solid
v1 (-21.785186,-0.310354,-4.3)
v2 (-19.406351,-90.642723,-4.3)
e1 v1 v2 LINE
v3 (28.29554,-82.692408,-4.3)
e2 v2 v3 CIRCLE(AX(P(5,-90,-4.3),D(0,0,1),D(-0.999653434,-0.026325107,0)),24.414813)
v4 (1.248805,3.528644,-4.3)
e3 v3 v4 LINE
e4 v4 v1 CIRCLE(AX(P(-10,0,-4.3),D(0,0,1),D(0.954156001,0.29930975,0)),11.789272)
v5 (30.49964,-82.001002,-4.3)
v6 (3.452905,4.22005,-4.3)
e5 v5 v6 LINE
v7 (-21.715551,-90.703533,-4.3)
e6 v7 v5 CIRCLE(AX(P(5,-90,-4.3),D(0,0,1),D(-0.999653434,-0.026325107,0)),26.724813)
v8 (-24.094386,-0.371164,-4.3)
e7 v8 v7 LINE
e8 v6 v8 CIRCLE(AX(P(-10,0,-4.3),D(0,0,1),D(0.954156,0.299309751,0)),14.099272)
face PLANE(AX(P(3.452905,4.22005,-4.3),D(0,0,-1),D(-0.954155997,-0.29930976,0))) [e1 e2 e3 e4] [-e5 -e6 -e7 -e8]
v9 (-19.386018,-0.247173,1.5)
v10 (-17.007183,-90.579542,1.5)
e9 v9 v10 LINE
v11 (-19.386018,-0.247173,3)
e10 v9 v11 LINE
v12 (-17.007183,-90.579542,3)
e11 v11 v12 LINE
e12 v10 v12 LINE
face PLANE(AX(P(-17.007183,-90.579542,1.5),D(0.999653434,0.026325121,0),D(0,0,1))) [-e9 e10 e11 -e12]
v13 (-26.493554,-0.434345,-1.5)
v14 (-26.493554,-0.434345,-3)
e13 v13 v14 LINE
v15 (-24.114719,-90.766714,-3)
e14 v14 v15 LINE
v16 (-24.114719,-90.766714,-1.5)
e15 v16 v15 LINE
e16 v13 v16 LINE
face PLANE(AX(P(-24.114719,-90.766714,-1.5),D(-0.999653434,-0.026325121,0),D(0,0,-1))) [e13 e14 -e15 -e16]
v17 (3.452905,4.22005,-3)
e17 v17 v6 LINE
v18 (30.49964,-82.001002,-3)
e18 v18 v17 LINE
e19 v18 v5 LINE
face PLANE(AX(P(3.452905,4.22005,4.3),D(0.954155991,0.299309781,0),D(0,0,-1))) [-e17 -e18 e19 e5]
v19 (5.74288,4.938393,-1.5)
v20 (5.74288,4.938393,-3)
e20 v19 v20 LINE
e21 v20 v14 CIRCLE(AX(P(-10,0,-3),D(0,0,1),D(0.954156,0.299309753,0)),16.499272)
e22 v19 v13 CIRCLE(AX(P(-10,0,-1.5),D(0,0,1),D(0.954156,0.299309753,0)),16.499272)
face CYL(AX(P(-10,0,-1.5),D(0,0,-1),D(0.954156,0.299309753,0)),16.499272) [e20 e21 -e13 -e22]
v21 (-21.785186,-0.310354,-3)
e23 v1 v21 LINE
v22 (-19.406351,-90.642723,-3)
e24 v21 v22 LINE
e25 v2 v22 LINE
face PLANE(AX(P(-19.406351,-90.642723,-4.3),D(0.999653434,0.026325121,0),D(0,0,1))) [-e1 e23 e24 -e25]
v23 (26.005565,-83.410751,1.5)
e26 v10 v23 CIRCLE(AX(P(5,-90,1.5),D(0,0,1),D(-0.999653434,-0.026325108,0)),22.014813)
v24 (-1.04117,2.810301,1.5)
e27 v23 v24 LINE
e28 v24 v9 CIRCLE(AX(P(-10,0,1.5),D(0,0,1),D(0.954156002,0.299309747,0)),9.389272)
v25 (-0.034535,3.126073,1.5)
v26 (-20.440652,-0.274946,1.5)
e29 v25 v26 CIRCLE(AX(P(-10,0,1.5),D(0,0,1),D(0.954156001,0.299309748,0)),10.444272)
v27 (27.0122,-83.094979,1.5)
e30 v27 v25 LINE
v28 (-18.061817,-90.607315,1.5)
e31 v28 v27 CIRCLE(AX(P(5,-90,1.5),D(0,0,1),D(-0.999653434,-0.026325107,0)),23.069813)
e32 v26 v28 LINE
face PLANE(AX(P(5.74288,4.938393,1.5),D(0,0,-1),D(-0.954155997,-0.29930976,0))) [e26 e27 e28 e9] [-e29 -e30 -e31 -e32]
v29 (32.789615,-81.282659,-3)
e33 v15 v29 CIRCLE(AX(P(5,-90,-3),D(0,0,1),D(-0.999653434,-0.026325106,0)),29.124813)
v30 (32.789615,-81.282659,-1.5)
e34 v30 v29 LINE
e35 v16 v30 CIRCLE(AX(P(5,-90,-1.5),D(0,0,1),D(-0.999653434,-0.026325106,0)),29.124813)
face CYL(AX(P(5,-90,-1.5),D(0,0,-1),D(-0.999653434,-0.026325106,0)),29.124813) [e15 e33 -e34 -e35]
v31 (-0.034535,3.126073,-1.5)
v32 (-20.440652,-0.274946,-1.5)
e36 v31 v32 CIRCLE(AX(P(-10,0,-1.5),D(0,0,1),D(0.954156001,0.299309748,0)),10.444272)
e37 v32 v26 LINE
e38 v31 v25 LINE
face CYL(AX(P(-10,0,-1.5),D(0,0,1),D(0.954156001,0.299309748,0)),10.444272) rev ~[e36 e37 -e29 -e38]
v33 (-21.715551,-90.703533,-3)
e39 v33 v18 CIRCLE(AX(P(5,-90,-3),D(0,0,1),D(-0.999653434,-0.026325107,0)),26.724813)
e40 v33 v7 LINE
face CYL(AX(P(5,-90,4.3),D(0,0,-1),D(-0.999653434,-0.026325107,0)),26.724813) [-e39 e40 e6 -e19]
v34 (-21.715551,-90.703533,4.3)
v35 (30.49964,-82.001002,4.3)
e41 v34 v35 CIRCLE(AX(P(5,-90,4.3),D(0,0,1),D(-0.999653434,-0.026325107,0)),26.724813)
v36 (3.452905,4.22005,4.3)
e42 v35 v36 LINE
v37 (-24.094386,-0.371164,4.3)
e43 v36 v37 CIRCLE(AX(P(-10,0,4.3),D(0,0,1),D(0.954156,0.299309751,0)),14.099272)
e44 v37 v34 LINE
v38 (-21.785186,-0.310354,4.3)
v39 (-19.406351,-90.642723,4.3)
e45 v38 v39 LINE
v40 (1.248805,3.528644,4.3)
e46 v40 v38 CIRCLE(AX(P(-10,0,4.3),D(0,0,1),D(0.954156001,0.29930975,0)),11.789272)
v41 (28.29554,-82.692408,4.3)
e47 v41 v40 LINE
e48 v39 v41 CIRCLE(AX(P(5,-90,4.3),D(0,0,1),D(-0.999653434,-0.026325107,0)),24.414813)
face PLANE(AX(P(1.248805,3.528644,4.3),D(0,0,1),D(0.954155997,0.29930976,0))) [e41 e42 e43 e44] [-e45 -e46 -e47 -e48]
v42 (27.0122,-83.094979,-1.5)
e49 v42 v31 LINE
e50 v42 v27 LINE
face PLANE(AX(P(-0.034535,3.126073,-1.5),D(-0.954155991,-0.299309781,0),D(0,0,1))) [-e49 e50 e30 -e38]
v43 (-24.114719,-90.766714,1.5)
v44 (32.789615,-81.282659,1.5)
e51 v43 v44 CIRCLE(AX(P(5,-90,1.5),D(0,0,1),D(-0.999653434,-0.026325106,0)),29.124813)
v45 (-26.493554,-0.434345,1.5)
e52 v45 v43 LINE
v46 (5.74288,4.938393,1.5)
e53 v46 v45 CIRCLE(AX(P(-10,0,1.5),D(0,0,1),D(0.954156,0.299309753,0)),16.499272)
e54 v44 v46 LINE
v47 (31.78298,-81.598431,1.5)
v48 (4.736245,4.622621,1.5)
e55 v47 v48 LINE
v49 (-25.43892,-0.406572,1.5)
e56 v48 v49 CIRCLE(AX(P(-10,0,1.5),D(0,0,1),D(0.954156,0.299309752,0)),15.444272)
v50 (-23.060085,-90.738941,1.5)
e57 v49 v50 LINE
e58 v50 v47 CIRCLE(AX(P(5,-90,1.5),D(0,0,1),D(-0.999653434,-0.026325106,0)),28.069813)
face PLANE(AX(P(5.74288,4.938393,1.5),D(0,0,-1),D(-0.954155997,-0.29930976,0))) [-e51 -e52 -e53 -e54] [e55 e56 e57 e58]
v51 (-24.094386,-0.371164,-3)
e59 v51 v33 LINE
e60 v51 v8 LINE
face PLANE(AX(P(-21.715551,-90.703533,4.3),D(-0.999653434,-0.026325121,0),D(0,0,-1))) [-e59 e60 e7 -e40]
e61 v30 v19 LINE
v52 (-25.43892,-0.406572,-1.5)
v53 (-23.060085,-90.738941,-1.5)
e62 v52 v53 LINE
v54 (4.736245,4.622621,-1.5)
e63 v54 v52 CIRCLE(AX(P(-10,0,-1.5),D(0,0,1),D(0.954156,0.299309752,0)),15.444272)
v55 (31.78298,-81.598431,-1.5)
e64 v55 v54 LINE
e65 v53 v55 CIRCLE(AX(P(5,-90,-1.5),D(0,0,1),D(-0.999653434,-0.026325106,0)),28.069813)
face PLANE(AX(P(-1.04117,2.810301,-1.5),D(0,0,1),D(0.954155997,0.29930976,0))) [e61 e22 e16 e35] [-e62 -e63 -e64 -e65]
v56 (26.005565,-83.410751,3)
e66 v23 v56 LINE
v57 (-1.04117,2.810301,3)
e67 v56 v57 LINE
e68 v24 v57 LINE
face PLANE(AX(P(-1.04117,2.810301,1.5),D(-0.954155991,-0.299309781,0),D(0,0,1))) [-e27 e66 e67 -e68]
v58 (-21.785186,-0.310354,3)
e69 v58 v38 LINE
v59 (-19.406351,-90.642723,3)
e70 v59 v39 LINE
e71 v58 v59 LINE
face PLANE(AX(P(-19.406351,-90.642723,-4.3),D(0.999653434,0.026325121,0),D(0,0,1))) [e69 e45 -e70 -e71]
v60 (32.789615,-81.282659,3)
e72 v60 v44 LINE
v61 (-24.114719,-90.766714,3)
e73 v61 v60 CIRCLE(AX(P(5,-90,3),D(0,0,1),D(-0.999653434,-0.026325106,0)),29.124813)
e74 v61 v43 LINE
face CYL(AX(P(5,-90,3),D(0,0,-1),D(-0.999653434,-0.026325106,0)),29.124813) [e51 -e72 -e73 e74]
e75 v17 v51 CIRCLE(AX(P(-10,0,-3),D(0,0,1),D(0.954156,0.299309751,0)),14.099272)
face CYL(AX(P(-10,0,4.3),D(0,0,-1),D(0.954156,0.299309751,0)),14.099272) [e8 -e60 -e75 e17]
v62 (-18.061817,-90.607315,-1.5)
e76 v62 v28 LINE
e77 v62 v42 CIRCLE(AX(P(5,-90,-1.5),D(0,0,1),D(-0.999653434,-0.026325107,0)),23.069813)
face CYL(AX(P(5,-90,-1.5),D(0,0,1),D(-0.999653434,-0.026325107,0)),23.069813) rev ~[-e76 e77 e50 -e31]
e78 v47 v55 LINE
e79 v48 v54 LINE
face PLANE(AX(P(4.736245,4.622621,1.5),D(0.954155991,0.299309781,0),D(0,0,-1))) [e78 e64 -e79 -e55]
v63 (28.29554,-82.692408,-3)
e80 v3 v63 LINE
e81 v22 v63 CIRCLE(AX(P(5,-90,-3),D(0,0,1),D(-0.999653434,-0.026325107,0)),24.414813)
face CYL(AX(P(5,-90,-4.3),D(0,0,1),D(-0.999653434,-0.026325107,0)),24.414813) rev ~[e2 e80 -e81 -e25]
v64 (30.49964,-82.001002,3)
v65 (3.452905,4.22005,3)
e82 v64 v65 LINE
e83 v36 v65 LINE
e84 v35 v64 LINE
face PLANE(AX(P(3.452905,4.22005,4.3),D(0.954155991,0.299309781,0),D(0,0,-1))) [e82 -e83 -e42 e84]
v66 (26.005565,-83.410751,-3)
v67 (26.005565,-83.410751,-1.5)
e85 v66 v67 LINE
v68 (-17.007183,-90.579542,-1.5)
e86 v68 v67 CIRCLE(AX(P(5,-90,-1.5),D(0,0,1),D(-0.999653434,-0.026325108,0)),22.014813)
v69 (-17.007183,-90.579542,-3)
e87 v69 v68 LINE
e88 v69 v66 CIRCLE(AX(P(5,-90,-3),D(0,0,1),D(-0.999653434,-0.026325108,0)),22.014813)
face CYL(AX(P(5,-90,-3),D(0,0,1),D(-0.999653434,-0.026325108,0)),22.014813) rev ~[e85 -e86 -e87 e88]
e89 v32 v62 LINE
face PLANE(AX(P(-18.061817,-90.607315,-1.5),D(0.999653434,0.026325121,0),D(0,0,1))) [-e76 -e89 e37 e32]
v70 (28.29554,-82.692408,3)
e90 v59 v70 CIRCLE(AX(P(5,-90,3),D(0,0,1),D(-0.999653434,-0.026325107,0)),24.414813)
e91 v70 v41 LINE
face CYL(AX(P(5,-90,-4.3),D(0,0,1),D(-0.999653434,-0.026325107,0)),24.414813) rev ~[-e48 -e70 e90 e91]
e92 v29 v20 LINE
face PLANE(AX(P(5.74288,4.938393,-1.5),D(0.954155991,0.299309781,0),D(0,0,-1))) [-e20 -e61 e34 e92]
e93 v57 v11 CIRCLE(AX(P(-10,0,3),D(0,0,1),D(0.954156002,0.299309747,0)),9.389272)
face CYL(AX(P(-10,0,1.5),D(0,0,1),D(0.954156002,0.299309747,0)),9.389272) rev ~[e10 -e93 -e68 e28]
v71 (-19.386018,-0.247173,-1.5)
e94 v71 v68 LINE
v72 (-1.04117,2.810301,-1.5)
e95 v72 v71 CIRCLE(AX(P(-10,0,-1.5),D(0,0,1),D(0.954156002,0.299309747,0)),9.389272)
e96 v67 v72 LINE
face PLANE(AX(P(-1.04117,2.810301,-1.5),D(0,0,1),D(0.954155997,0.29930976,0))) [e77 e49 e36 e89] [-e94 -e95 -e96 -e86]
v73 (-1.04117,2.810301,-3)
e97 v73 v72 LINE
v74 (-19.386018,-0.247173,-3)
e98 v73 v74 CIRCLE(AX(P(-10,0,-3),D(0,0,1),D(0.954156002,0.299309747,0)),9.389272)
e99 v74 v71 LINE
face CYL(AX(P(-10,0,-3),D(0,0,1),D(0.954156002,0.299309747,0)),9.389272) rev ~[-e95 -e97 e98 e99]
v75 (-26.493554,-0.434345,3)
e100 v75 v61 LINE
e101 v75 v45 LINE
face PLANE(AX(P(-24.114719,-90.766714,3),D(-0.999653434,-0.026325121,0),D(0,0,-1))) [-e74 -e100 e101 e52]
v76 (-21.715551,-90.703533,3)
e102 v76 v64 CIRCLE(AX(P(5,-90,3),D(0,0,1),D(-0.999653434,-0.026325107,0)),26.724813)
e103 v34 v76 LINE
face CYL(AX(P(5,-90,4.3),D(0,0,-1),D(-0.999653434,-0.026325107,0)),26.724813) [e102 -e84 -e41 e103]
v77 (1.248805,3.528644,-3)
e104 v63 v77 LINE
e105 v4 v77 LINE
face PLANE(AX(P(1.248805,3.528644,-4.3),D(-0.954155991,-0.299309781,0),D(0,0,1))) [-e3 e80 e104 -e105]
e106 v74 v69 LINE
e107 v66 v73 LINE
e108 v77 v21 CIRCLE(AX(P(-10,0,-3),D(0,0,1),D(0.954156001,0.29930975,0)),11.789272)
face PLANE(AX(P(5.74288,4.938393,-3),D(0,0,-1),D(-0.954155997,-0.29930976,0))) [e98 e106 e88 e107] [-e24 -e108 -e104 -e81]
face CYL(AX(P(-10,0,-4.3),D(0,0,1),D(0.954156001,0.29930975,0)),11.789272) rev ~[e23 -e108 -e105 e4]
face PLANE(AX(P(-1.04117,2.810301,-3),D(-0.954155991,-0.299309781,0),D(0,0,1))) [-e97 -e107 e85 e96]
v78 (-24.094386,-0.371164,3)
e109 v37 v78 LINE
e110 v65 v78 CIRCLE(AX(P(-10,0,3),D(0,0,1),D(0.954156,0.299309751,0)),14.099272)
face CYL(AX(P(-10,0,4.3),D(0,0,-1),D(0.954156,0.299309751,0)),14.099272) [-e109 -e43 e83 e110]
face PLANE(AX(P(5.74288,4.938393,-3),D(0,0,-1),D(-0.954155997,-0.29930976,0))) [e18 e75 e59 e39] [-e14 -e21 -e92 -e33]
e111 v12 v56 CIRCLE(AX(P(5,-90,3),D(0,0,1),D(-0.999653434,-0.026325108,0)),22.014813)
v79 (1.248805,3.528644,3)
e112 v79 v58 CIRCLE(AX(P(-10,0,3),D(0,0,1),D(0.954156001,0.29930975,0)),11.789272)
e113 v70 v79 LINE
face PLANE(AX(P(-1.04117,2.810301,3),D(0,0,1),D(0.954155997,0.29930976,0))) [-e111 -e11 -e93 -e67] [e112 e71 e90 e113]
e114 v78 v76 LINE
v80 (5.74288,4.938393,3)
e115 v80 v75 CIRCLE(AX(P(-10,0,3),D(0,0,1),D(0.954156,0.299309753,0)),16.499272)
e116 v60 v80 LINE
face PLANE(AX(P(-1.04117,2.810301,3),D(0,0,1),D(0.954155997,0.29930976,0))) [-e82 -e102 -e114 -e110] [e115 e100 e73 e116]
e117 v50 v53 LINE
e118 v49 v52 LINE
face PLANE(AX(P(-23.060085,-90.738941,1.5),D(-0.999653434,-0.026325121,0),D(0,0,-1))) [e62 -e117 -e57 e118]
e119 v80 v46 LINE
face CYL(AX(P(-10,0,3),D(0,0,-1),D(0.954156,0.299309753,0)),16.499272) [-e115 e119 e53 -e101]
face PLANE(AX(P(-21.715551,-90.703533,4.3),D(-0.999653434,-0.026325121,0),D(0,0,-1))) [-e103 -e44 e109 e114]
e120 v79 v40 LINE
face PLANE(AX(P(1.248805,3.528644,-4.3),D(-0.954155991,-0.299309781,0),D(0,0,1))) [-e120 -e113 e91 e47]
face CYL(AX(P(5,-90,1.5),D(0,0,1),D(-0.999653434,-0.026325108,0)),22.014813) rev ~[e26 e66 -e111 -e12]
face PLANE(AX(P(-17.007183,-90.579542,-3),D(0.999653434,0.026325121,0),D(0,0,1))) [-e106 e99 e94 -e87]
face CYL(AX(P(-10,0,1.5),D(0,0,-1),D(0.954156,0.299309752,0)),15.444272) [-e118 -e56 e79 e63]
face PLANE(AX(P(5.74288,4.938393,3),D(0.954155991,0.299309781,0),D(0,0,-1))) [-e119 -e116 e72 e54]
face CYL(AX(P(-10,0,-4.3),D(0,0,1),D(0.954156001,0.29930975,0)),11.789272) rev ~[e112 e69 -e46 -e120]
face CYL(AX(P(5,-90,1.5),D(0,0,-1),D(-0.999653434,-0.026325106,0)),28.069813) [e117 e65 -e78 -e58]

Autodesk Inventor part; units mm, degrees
ref_plane "Work Plane2" through (-10, 0, 0) normal (-1, 0, 0) x (0, 0, 1)
ref_plane "Work Plane3" through (5, -90, 0) normal (-0.0877739, 0.9961404, 0) x (0, 0, 1)
sketch "Path" plane through (0, 0, 0) normal (0, 0, 1) x (1, 0, 0)
  arc A0 (2.350855, 3.874347) -> (-22.939786, -0.340759) centre (-10, 0) ccw
  arc A1 (-20.560951, -90.673128) -> (29.39759, -82.346705) centre (5, -90) ccw
  line L0 (-20.560951, -90.673128) -> (-22.939786, -0.340759)
  line L1 (2.350855, 3.874347) -> (29.39759, -82.346705)
  dimension "d31" = 7.11
ref_plane "Section Plane" through (-22.939786, -0.340759, 0) normal (0.0263251, -0.9996534, 0) x (0, 0, 1)
sketch "Section Sketch" plane through (-22.939786, -0.340759, 0) normal (0.0263251, -0.9996534, 0) x (0, 0, 1)
  line L0 (-4.3, -1.155) -> (4.3, -1.155)
  line L1 (4.3, -1.155) -> (4.3, 1.155)
  line L2 (4.3, 1.155) -> (-4.3, 1.155)
  line L3 (-4.3, 1.155) -> (-4.3, -1.155)
  line L4 (-1.5, -2.5) -> (1.5, -2.5)
  line L5 (1.5, -2.5) -> (1.5, 2.5)
  line L6 (1.5, 2.5) -> (-1.5, 2.5)
  line L7 (-1.5, 2.5) -> (-1.5, -2.5)
  line L8 (-1.5, 0) -> (1.5, 0) construction
  line L9 (-3, -3.555) -> (-1.5, -3.555)
  line L10 (-1.5, -3.555) -> (-1.5, 3.555)
  line L11 (-1.5, 3.555) -> (-3, 3.555)
  line L12 (-3, 3.555) -> (-3, -3.555)
  line L13 (1.5, -3.555) -> (3, -3.555)
  line L14 (3, -3.555) -> (3, 3.555)
  line L15 (3, 3.555) -> (1.5, 3.555)
  line L16 (1.5, 3.555) -> (1.5, -3.555)
  line L17 (-4.3, 0) -> (4.3, 0) construction
  point P0 (0, 0)
  point P1 (0, 0)
  dimension "d21" = 2.31
  dimension "d22" = 5
  dimension "d23" = 3
  dimension "d24" = 1.5
  dimension "d31" = 7.11
  dimension "d32" = 8.6
sweep "Solid" add profiles "Section Sketch" path "Path"
pattern_of_one "Strand Pattern"
equation "\"d21\" = da_d2"
equation "\"d22\" = da_d1"
equation "\"d23\" = da_b1"
equation "\"d24\" = da_t1 + da_t2"
equation "\"d30\" = da_pt"
equation "\"da_p\" = 8"
equation "\"da_b1\" = 3"
equation "\"da_h2\" = 7.11"
equation "\"da_h3\" = 7.11"
equation "\"da_d1\" = 5"
equation "\"da_d2\" = 2.31"
equation "\"da_pt\" = 5.64"
equation "\"da_b\" = 8.6"
equation "\"da_t1\" = 0.75"
equation "\"da_t2\" = 0.75"
properties part number "Roller Chain"
